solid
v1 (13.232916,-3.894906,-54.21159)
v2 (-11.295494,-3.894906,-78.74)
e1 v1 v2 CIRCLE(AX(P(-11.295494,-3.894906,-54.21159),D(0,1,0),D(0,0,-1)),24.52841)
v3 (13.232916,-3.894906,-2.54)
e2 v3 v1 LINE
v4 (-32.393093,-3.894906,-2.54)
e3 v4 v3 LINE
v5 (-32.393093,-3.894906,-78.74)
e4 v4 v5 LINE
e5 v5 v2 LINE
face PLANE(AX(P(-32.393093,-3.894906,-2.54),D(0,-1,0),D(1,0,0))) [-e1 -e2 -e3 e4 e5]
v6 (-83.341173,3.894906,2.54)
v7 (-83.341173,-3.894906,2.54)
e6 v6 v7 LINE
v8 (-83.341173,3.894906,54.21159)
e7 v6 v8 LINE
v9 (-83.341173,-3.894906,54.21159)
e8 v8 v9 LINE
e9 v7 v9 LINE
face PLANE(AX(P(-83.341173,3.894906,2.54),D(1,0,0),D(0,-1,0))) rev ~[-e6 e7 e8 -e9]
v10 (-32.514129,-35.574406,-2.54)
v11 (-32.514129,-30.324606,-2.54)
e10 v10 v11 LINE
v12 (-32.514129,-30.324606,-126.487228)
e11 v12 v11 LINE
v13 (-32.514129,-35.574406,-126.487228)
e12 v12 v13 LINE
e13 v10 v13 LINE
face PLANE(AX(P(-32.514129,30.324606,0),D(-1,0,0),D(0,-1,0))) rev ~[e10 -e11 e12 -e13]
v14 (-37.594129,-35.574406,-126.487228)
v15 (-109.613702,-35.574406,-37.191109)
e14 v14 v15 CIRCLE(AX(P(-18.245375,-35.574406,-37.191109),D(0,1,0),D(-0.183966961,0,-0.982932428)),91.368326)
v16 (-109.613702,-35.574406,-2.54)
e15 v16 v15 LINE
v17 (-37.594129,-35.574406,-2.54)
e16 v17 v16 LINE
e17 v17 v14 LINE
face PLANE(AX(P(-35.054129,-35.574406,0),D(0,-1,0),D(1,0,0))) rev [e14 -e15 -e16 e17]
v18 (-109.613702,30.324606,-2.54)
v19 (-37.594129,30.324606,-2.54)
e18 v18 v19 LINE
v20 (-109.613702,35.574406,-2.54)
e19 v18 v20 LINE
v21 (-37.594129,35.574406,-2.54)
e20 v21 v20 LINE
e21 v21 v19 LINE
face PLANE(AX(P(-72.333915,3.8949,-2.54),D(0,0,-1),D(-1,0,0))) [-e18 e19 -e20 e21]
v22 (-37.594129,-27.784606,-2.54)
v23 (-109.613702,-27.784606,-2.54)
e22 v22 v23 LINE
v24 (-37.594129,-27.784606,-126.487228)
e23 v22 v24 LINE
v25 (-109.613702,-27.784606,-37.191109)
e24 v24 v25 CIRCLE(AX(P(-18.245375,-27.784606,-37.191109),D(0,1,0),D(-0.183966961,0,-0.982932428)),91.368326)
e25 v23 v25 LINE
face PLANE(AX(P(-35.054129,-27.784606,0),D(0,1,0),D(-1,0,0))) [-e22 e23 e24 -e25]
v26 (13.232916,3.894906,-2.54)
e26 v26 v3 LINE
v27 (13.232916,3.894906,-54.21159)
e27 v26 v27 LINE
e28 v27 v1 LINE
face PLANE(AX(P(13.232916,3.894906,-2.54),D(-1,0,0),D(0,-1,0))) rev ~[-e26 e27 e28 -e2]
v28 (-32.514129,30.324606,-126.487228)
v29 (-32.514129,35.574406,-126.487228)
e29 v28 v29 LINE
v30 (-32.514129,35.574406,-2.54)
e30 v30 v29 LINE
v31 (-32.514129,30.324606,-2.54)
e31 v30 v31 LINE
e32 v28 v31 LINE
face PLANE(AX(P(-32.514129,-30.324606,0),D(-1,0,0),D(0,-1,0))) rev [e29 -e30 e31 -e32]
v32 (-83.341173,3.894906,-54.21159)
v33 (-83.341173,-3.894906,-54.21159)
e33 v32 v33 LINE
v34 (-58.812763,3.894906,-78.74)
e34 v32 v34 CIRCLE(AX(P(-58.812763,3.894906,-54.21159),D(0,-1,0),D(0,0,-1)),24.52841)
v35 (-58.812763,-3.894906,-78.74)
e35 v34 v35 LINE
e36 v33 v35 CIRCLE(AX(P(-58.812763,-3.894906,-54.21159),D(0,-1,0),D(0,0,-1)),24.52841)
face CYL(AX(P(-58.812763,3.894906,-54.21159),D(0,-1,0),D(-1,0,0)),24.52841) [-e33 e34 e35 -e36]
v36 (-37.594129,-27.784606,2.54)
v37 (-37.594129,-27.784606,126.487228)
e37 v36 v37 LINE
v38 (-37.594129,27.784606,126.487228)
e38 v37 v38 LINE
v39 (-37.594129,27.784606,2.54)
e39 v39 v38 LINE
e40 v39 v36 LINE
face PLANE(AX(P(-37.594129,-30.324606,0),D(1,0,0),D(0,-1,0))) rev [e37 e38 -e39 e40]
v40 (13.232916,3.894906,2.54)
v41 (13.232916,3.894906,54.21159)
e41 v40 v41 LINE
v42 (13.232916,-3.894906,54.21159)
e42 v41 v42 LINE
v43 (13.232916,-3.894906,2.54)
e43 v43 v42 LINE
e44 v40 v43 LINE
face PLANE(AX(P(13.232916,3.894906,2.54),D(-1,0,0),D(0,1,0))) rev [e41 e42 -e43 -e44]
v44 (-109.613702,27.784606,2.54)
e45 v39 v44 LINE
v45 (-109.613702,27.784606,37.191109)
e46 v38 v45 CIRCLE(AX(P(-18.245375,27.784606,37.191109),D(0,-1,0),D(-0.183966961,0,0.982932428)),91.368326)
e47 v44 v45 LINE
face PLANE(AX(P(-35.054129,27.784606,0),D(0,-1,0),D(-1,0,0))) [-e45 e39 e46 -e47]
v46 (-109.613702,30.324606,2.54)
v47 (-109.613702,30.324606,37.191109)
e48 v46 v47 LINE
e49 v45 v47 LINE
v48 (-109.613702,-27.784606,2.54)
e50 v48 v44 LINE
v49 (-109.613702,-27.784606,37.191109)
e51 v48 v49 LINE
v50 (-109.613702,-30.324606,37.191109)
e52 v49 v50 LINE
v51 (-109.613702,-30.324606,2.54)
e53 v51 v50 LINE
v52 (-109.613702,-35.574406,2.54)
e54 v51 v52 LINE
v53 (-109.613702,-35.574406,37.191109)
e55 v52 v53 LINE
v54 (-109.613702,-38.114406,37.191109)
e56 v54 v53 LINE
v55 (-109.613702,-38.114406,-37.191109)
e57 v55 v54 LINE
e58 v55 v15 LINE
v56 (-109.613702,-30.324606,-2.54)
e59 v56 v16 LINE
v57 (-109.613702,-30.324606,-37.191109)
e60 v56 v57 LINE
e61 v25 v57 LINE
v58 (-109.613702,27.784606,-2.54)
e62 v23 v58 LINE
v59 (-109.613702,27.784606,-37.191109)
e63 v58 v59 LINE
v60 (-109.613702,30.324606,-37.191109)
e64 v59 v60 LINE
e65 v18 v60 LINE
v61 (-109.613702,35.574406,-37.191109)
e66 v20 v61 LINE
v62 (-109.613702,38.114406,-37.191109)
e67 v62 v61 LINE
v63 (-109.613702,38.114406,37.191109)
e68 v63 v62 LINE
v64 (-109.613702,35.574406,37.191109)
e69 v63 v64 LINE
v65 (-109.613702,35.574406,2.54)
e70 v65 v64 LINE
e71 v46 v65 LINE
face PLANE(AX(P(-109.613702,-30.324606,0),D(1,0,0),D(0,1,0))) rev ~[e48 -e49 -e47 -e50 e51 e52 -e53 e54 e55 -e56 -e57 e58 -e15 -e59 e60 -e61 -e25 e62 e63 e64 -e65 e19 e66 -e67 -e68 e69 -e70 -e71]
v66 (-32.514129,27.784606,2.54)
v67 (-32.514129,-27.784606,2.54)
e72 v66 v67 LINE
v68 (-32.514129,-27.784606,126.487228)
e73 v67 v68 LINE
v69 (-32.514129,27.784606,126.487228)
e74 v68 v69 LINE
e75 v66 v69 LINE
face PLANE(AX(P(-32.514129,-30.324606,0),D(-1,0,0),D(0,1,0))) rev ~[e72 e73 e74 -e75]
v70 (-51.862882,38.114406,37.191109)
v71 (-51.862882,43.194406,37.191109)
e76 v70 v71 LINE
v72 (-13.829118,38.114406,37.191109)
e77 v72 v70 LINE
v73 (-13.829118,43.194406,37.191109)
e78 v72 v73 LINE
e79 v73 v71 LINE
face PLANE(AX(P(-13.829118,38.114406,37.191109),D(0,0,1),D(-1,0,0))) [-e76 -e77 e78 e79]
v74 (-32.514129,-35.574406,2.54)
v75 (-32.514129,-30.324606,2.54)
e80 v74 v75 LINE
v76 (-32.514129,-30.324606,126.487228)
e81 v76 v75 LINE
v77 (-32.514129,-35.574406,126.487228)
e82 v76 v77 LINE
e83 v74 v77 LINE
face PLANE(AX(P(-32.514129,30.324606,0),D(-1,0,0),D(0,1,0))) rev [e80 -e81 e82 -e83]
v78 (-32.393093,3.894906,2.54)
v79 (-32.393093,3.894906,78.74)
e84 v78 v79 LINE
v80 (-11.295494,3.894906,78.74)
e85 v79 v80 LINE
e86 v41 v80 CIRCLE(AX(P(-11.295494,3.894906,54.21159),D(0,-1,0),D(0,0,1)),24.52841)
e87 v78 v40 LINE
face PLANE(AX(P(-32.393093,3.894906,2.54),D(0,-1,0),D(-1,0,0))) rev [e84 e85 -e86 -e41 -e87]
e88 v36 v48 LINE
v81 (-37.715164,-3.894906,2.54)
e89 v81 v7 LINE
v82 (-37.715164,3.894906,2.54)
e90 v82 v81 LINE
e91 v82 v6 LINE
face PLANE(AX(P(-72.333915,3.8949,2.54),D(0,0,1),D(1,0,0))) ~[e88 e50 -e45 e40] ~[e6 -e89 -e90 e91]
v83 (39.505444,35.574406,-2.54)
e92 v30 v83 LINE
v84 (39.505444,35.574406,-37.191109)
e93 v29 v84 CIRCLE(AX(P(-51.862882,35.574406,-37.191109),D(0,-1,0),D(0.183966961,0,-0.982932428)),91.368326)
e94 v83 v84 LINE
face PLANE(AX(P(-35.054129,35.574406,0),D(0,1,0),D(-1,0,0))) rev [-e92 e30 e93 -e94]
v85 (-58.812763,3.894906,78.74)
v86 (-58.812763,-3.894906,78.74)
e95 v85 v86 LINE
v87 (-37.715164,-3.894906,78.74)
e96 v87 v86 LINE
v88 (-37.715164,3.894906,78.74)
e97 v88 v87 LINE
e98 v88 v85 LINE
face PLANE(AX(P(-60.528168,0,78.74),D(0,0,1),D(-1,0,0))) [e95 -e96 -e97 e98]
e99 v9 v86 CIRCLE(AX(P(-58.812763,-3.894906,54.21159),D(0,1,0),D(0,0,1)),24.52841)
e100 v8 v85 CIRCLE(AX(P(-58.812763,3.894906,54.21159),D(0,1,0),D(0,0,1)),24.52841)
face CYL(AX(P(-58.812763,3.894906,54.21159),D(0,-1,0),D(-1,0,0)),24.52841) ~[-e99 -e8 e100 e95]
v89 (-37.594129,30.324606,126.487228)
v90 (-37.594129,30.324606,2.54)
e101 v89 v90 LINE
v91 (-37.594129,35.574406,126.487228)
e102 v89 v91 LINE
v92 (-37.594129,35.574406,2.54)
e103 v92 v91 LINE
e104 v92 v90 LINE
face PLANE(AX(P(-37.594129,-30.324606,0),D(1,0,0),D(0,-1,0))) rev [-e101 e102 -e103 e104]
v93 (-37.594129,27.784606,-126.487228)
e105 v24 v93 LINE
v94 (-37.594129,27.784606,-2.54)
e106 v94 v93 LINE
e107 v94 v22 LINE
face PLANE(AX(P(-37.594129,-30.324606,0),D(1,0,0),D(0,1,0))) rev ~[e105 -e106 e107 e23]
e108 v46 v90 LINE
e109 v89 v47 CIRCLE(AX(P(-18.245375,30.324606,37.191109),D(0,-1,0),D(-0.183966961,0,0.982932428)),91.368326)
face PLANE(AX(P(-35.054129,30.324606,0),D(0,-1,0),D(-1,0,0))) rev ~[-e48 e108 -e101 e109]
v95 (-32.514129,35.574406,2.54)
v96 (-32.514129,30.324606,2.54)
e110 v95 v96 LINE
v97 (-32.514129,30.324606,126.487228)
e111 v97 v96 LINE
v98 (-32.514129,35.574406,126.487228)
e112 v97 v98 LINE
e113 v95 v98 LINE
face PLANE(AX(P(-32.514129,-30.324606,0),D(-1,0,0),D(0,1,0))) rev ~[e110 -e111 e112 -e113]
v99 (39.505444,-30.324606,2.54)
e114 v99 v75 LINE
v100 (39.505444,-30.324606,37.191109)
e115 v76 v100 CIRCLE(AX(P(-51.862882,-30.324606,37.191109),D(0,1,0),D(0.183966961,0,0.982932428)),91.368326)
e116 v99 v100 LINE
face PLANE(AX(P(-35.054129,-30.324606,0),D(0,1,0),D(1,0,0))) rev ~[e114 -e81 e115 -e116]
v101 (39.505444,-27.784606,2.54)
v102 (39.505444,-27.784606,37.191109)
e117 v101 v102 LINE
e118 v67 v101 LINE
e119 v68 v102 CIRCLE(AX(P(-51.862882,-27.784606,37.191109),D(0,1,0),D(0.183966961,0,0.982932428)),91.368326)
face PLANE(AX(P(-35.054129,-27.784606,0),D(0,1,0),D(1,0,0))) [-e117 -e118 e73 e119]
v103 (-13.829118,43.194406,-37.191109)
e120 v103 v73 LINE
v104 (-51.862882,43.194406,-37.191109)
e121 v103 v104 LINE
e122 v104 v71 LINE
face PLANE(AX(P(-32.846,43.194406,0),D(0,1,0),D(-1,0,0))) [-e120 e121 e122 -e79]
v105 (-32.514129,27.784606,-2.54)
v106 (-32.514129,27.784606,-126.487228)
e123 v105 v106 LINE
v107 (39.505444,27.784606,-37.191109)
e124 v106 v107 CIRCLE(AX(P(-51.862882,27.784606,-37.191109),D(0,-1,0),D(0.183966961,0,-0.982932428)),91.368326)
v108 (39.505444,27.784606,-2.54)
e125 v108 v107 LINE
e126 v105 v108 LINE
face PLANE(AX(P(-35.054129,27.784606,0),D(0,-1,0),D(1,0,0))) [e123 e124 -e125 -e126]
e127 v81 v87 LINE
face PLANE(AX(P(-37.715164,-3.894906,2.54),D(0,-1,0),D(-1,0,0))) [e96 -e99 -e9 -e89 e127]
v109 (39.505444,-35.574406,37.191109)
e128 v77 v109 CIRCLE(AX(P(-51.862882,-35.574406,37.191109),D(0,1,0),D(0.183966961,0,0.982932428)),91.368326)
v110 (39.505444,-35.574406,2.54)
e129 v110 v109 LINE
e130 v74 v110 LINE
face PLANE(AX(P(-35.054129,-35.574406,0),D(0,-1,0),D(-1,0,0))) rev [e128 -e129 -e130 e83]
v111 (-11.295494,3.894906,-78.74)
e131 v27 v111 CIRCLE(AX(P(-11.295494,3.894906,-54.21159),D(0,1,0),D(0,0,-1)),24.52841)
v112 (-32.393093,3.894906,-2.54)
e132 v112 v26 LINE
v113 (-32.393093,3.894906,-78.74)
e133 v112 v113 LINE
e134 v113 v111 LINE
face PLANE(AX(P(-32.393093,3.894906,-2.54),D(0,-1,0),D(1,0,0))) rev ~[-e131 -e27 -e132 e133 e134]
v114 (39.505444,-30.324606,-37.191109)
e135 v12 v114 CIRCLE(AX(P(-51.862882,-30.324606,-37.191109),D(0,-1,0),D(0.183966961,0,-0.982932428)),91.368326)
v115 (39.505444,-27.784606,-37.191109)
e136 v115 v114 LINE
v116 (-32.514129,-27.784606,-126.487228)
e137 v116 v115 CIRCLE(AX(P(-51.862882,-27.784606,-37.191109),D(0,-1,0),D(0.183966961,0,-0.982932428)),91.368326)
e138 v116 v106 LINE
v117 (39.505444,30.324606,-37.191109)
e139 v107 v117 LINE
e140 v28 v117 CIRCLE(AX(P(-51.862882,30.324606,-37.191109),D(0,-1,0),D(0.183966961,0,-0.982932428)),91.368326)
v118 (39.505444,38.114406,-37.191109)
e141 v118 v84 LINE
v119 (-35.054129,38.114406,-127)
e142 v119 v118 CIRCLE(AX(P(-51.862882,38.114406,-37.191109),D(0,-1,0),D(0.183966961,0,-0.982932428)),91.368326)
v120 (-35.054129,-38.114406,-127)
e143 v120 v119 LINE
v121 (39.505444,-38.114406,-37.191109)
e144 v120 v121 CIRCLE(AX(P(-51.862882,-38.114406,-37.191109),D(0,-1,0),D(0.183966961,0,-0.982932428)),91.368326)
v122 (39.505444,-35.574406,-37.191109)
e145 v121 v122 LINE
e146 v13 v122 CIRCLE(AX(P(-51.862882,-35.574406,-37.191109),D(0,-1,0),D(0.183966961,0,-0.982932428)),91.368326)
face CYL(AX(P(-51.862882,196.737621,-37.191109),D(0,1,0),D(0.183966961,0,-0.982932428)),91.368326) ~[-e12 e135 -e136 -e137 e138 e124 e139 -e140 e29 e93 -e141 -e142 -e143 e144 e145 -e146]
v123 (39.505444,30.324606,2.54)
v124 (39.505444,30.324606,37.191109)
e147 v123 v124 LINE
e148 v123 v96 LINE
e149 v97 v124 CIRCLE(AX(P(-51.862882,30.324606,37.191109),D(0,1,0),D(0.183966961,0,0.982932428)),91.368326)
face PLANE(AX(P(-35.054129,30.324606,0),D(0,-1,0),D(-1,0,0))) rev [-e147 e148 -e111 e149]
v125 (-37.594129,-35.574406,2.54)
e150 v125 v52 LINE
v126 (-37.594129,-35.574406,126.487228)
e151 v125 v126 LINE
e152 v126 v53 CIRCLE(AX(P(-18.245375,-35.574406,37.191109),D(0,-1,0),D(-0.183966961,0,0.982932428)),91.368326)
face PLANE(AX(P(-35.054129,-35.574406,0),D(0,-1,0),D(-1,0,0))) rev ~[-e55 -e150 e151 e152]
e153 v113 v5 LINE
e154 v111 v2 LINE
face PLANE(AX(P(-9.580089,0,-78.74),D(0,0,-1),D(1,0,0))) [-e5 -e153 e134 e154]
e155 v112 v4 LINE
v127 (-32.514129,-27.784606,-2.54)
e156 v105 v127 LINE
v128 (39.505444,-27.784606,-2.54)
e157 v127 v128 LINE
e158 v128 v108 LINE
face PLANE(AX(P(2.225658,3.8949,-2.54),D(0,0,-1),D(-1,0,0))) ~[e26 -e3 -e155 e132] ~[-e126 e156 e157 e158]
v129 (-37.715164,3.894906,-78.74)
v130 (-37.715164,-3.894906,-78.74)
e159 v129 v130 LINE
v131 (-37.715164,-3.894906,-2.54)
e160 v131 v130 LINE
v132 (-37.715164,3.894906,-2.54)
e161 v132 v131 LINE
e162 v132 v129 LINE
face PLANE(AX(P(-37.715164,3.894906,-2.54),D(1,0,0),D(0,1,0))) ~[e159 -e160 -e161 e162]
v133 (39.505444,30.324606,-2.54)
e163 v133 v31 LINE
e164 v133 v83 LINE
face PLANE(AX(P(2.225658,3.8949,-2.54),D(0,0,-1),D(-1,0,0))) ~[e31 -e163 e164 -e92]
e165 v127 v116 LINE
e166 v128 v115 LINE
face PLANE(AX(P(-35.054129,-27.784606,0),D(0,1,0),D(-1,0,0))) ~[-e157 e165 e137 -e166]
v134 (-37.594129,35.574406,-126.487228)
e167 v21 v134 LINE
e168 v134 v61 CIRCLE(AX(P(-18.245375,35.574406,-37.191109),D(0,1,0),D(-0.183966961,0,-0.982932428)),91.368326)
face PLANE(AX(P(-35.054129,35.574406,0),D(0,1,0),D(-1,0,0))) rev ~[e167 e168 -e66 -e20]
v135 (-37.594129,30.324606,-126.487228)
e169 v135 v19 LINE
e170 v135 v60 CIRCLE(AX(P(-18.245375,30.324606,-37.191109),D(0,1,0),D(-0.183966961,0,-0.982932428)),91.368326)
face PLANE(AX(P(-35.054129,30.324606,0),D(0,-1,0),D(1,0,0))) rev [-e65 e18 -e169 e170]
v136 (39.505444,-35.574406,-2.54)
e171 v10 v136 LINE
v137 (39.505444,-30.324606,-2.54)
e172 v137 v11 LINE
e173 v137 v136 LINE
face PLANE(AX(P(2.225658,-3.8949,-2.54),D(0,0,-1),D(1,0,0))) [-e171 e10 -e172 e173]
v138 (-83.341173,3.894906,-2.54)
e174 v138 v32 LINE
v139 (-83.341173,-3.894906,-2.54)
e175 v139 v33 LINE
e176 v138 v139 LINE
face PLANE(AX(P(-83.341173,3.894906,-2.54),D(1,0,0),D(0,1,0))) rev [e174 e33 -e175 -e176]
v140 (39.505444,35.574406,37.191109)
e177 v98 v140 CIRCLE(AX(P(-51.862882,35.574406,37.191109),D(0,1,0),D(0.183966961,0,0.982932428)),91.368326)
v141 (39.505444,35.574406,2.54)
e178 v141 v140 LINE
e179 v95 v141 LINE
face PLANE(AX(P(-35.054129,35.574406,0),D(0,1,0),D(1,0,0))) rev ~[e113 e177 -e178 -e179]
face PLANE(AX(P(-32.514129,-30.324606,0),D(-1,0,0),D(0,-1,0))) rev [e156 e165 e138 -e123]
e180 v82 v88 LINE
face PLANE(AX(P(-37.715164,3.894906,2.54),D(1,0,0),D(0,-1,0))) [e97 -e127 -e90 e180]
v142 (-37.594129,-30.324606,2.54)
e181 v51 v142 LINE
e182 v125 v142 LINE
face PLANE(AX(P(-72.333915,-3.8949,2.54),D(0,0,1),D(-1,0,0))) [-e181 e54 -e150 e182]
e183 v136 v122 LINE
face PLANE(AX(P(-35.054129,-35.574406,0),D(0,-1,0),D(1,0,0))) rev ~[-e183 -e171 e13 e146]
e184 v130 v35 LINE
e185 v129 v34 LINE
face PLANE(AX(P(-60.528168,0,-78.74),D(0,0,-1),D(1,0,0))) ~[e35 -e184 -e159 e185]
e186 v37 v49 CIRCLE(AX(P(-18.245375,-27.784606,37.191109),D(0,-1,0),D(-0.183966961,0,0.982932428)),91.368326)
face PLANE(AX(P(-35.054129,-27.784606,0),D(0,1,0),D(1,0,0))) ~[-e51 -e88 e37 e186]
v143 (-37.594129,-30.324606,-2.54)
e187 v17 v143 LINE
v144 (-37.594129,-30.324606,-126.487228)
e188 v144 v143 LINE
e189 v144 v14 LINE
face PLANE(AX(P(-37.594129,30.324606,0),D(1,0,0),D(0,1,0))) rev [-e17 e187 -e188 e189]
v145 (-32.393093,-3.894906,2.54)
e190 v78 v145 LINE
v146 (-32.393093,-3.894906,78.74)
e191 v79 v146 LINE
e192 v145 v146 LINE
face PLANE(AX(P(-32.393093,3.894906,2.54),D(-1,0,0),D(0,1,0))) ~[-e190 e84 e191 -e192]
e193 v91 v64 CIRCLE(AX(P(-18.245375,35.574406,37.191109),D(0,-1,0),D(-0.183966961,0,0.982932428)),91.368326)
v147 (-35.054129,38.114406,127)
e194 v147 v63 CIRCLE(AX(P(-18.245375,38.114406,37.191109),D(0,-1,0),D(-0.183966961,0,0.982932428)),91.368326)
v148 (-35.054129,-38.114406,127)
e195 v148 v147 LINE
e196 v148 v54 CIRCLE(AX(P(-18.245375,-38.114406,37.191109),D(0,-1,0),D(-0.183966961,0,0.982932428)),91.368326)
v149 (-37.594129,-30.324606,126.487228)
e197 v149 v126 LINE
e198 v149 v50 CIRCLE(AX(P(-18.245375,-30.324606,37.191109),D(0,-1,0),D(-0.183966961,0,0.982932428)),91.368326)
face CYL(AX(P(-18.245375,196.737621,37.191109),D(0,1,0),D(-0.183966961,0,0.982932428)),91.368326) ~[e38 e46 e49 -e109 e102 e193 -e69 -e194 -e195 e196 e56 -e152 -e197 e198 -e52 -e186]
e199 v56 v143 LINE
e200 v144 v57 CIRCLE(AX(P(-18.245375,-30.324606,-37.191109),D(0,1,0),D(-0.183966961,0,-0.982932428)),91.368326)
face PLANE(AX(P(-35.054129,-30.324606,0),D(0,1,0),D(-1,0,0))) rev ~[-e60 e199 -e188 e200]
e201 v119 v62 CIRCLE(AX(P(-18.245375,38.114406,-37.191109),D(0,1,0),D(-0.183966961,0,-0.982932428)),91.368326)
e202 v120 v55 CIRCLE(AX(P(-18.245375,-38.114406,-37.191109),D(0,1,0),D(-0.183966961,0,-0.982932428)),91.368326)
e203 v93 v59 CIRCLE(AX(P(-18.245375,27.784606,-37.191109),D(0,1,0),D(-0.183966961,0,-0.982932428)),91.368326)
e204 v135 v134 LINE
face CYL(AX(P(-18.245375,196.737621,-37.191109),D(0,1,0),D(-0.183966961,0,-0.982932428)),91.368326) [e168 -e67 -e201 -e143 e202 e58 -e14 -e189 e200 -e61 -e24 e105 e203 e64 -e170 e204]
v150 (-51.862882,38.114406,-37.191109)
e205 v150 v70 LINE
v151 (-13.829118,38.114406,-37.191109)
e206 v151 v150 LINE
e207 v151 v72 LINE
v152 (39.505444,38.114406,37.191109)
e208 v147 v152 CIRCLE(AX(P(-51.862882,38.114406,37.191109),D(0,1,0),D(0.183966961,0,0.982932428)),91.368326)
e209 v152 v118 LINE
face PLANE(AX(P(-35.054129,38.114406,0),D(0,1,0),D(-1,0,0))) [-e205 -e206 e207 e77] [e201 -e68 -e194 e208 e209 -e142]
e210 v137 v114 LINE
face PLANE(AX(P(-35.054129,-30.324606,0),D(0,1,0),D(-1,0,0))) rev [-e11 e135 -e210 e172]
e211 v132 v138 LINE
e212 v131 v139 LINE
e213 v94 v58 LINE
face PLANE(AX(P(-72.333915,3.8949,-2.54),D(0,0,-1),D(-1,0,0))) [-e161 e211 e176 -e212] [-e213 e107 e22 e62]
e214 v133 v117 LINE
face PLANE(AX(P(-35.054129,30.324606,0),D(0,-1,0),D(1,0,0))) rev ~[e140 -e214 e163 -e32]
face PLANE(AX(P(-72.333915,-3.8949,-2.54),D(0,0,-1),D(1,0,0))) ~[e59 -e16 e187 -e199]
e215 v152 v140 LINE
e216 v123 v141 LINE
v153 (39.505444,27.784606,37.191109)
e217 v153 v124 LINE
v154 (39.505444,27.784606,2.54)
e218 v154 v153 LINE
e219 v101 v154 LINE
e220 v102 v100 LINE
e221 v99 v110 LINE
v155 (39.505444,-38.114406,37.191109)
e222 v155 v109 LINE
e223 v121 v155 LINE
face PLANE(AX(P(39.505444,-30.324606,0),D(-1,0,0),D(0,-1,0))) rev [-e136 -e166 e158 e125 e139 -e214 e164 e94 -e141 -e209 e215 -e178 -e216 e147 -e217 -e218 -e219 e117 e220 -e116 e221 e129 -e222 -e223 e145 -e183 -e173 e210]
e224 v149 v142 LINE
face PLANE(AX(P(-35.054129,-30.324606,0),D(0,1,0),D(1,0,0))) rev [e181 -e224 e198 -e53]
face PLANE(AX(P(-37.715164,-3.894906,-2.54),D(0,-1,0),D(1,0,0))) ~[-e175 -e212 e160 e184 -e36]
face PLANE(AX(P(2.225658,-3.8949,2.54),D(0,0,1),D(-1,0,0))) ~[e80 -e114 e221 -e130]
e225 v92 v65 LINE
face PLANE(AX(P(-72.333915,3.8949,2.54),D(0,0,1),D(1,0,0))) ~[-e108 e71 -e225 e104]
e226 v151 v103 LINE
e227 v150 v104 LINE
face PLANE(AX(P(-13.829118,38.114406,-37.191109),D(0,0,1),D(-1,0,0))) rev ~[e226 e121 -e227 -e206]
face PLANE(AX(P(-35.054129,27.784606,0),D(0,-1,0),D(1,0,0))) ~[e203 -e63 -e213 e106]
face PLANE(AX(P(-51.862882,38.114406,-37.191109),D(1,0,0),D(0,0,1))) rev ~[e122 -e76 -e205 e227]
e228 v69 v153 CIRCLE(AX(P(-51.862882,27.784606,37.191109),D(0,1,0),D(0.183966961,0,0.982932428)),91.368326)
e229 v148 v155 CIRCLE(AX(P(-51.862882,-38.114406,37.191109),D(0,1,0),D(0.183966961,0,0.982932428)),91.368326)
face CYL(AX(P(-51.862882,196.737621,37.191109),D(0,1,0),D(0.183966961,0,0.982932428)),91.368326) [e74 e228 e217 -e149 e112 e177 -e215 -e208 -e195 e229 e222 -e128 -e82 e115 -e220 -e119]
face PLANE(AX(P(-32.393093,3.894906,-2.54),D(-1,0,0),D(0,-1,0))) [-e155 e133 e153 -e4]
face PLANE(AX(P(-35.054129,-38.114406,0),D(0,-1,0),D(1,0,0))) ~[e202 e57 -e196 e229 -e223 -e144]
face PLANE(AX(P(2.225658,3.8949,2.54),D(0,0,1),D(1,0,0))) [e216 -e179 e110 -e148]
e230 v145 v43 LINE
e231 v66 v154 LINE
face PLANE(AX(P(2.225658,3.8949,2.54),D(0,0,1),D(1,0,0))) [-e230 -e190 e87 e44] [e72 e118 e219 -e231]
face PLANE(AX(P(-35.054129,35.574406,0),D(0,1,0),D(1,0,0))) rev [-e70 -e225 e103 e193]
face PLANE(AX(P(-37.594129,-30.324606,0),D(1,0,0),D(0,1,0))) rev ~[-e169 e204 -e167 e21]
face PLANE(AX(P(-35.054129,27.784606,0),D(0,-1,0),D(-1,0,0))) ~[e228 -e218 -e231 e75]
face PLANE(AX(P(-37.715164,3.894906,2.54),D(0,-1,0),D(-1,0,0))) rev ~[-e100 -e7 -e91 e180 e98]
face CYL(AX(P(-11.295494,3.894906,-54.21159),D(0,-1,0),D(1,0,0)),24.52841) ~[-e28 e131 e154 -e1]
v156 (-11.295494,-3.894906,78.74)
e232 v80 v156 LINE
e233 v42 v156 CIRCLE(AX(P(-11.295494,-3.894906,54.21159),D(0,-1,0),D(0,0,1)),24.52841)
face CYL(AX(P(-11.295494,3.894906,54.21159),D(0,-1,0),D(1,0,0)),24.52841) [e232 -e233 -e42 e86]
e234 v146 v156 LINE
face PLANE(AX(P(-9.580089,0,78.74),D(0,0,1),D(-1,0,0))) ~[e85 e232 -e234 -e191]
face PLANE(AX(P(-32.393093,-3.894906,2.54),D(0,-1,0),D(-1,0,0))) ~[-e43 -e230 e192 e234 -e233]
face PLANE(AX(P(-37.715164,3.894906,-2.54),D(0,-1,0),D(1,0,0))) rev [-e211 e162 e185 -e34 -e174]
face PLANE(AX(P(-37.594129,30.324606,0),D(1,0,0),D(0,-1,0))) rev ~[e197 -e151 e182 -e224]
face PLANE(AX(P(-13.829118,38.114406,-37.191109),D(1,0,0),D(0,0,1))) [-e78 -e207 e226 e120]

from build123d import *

# Parameters (mm, degrees)
F0_W        = 74.5595730841
F0_H        = 68.4390123934
F1_DEPTH    = 127
F2_T        = -2.54
F3_T1_DEPTH = 451.5844547388
F3_T3_DEPTH = 451.5844547388
F6_W        = 45.6260088831
F6_H        = 7.7898120508
F7_DEPTH    = 76.2
F8_R        = 24.5284097937
F11_W       = 38.0337639379
F11_H       = 74.3822181045
F12_DEPTH   = 5.08


# Not quite as in the source:
# - a fillet or chamfer that OpenCascade refuses, or shapes differently, is made with other operations: its cross-section is extruded or revolved along the edge and cut away or added
# - the program builds the solid bodies; features that only make, move or delete a surface that nothing else refers to are left out


with BuildPart() as f1:
    # F0 (on Top) → F1 (new body)
    with BuildSketch(Plane.XY):
        with Locations((2.225657925, 3.8948999718)):
            Rectangle(F0_W, F0_H)
    extrude(amount=F1_DEPTH)

    # F2
    f2_openings = [f1.faces().sort_by_distance(p)[0] for p in [
        (2.225658, 3.8949, 127),
        (39.505444, 3.8949, 63.5),
    ]]
    offset(amount=F2_T, openings=f2_openings)

    # F3: fillet of radius 91.3683264816 on 2 edges, made by hand

    # F3_s2 → F3_t1 (cut)
    with BuildSketch(Plane.XZ.offset(-196.7376211445)):
        with BuildLine():
            ThreePointArc((-35.054128617, 127), (18.4363311824, 95.5536973082), (39.5054444671, 37.1911090522))
            Line((39.5054444671, 37.1911090522), (39.5054444671, 127))
            Line((39.5054444671, 127), (-35.054128617, 127))
        make_face()
    extrude(amount=F3_T1_DEPTH, mode=Mode.SUBTRACT)

    # F3_s4 → F3_t3 (cut)
    with BuildSketch(Plane.XZ.offset(-262.6366335379)):
        with BuildLine():
            ThreePointArc((-35.054128617, 127), (18.4363311824, 95.5536973082), (39.5054444671, 37.1911090522))
            Line((39.5054444671, 37.1911090522), (39.5054444671, 127))
            Line((39.5054444671, 127), (-35.054128617, 127))
        make_face()
    extrude(amount=F3_T3_DEPTH, mode=Mode.SUBTRACT)

    # F4: F1 across plane


with BuildPart() as f1_1:
    add(f1.part)
    add(f1.part.mirror(Plane.XZ))

    # F5: F1 across plane


with BuildPart() as f1_2:
    add(f1_1.part)
    add(f1_1.part.mirror(Plane.XY))

    # F6 (on face) → F7 (join)
    with BuildSketch(Plane(origin=(0, 0, -2.54), x_dir=(1, 0, 0), z_dir=(0, 0, -1))):
        with Locations((-9.5800887793, 0)):
            Rectangle(F6_W, F6_H)
    extrude(amount=F7_DEPTH)

    # F8
    f8_edges = [f1_2.edges().sort_by_distance(p)[0] for p in [
        (13.232916, 0, -78.74),
    ]]
    fillet(f8_edges, radius=F8_R)

    # F9: F1 across plane


with BuildPart() as f1_3:
    add(f1_2.part)
    add(f1_2.part.mirror(Plane.XY))

    # F10: F1 across face


with BuildPart() as f1_4:
    add(f1_3.part)
    add(f1_3.part.mirror(Plane(origin=(-35.054128617, 0, 0), x_dir=(0, -1, 0), z_dir=(-1, 0, 0))))

    # F11 (on face) → F12 (join)
    with BuildSketch(Plane(origin=(0, 38.1144061685, 0), x_dir=(-1, 0, 0), z_dir=(0, 1, 0))):
        with Locations((32.8460000455, 0)):
            Rectangle(F11_W, F11_H)
    extrude(amount=F12_DEPTH)


solid = f1_4.part
